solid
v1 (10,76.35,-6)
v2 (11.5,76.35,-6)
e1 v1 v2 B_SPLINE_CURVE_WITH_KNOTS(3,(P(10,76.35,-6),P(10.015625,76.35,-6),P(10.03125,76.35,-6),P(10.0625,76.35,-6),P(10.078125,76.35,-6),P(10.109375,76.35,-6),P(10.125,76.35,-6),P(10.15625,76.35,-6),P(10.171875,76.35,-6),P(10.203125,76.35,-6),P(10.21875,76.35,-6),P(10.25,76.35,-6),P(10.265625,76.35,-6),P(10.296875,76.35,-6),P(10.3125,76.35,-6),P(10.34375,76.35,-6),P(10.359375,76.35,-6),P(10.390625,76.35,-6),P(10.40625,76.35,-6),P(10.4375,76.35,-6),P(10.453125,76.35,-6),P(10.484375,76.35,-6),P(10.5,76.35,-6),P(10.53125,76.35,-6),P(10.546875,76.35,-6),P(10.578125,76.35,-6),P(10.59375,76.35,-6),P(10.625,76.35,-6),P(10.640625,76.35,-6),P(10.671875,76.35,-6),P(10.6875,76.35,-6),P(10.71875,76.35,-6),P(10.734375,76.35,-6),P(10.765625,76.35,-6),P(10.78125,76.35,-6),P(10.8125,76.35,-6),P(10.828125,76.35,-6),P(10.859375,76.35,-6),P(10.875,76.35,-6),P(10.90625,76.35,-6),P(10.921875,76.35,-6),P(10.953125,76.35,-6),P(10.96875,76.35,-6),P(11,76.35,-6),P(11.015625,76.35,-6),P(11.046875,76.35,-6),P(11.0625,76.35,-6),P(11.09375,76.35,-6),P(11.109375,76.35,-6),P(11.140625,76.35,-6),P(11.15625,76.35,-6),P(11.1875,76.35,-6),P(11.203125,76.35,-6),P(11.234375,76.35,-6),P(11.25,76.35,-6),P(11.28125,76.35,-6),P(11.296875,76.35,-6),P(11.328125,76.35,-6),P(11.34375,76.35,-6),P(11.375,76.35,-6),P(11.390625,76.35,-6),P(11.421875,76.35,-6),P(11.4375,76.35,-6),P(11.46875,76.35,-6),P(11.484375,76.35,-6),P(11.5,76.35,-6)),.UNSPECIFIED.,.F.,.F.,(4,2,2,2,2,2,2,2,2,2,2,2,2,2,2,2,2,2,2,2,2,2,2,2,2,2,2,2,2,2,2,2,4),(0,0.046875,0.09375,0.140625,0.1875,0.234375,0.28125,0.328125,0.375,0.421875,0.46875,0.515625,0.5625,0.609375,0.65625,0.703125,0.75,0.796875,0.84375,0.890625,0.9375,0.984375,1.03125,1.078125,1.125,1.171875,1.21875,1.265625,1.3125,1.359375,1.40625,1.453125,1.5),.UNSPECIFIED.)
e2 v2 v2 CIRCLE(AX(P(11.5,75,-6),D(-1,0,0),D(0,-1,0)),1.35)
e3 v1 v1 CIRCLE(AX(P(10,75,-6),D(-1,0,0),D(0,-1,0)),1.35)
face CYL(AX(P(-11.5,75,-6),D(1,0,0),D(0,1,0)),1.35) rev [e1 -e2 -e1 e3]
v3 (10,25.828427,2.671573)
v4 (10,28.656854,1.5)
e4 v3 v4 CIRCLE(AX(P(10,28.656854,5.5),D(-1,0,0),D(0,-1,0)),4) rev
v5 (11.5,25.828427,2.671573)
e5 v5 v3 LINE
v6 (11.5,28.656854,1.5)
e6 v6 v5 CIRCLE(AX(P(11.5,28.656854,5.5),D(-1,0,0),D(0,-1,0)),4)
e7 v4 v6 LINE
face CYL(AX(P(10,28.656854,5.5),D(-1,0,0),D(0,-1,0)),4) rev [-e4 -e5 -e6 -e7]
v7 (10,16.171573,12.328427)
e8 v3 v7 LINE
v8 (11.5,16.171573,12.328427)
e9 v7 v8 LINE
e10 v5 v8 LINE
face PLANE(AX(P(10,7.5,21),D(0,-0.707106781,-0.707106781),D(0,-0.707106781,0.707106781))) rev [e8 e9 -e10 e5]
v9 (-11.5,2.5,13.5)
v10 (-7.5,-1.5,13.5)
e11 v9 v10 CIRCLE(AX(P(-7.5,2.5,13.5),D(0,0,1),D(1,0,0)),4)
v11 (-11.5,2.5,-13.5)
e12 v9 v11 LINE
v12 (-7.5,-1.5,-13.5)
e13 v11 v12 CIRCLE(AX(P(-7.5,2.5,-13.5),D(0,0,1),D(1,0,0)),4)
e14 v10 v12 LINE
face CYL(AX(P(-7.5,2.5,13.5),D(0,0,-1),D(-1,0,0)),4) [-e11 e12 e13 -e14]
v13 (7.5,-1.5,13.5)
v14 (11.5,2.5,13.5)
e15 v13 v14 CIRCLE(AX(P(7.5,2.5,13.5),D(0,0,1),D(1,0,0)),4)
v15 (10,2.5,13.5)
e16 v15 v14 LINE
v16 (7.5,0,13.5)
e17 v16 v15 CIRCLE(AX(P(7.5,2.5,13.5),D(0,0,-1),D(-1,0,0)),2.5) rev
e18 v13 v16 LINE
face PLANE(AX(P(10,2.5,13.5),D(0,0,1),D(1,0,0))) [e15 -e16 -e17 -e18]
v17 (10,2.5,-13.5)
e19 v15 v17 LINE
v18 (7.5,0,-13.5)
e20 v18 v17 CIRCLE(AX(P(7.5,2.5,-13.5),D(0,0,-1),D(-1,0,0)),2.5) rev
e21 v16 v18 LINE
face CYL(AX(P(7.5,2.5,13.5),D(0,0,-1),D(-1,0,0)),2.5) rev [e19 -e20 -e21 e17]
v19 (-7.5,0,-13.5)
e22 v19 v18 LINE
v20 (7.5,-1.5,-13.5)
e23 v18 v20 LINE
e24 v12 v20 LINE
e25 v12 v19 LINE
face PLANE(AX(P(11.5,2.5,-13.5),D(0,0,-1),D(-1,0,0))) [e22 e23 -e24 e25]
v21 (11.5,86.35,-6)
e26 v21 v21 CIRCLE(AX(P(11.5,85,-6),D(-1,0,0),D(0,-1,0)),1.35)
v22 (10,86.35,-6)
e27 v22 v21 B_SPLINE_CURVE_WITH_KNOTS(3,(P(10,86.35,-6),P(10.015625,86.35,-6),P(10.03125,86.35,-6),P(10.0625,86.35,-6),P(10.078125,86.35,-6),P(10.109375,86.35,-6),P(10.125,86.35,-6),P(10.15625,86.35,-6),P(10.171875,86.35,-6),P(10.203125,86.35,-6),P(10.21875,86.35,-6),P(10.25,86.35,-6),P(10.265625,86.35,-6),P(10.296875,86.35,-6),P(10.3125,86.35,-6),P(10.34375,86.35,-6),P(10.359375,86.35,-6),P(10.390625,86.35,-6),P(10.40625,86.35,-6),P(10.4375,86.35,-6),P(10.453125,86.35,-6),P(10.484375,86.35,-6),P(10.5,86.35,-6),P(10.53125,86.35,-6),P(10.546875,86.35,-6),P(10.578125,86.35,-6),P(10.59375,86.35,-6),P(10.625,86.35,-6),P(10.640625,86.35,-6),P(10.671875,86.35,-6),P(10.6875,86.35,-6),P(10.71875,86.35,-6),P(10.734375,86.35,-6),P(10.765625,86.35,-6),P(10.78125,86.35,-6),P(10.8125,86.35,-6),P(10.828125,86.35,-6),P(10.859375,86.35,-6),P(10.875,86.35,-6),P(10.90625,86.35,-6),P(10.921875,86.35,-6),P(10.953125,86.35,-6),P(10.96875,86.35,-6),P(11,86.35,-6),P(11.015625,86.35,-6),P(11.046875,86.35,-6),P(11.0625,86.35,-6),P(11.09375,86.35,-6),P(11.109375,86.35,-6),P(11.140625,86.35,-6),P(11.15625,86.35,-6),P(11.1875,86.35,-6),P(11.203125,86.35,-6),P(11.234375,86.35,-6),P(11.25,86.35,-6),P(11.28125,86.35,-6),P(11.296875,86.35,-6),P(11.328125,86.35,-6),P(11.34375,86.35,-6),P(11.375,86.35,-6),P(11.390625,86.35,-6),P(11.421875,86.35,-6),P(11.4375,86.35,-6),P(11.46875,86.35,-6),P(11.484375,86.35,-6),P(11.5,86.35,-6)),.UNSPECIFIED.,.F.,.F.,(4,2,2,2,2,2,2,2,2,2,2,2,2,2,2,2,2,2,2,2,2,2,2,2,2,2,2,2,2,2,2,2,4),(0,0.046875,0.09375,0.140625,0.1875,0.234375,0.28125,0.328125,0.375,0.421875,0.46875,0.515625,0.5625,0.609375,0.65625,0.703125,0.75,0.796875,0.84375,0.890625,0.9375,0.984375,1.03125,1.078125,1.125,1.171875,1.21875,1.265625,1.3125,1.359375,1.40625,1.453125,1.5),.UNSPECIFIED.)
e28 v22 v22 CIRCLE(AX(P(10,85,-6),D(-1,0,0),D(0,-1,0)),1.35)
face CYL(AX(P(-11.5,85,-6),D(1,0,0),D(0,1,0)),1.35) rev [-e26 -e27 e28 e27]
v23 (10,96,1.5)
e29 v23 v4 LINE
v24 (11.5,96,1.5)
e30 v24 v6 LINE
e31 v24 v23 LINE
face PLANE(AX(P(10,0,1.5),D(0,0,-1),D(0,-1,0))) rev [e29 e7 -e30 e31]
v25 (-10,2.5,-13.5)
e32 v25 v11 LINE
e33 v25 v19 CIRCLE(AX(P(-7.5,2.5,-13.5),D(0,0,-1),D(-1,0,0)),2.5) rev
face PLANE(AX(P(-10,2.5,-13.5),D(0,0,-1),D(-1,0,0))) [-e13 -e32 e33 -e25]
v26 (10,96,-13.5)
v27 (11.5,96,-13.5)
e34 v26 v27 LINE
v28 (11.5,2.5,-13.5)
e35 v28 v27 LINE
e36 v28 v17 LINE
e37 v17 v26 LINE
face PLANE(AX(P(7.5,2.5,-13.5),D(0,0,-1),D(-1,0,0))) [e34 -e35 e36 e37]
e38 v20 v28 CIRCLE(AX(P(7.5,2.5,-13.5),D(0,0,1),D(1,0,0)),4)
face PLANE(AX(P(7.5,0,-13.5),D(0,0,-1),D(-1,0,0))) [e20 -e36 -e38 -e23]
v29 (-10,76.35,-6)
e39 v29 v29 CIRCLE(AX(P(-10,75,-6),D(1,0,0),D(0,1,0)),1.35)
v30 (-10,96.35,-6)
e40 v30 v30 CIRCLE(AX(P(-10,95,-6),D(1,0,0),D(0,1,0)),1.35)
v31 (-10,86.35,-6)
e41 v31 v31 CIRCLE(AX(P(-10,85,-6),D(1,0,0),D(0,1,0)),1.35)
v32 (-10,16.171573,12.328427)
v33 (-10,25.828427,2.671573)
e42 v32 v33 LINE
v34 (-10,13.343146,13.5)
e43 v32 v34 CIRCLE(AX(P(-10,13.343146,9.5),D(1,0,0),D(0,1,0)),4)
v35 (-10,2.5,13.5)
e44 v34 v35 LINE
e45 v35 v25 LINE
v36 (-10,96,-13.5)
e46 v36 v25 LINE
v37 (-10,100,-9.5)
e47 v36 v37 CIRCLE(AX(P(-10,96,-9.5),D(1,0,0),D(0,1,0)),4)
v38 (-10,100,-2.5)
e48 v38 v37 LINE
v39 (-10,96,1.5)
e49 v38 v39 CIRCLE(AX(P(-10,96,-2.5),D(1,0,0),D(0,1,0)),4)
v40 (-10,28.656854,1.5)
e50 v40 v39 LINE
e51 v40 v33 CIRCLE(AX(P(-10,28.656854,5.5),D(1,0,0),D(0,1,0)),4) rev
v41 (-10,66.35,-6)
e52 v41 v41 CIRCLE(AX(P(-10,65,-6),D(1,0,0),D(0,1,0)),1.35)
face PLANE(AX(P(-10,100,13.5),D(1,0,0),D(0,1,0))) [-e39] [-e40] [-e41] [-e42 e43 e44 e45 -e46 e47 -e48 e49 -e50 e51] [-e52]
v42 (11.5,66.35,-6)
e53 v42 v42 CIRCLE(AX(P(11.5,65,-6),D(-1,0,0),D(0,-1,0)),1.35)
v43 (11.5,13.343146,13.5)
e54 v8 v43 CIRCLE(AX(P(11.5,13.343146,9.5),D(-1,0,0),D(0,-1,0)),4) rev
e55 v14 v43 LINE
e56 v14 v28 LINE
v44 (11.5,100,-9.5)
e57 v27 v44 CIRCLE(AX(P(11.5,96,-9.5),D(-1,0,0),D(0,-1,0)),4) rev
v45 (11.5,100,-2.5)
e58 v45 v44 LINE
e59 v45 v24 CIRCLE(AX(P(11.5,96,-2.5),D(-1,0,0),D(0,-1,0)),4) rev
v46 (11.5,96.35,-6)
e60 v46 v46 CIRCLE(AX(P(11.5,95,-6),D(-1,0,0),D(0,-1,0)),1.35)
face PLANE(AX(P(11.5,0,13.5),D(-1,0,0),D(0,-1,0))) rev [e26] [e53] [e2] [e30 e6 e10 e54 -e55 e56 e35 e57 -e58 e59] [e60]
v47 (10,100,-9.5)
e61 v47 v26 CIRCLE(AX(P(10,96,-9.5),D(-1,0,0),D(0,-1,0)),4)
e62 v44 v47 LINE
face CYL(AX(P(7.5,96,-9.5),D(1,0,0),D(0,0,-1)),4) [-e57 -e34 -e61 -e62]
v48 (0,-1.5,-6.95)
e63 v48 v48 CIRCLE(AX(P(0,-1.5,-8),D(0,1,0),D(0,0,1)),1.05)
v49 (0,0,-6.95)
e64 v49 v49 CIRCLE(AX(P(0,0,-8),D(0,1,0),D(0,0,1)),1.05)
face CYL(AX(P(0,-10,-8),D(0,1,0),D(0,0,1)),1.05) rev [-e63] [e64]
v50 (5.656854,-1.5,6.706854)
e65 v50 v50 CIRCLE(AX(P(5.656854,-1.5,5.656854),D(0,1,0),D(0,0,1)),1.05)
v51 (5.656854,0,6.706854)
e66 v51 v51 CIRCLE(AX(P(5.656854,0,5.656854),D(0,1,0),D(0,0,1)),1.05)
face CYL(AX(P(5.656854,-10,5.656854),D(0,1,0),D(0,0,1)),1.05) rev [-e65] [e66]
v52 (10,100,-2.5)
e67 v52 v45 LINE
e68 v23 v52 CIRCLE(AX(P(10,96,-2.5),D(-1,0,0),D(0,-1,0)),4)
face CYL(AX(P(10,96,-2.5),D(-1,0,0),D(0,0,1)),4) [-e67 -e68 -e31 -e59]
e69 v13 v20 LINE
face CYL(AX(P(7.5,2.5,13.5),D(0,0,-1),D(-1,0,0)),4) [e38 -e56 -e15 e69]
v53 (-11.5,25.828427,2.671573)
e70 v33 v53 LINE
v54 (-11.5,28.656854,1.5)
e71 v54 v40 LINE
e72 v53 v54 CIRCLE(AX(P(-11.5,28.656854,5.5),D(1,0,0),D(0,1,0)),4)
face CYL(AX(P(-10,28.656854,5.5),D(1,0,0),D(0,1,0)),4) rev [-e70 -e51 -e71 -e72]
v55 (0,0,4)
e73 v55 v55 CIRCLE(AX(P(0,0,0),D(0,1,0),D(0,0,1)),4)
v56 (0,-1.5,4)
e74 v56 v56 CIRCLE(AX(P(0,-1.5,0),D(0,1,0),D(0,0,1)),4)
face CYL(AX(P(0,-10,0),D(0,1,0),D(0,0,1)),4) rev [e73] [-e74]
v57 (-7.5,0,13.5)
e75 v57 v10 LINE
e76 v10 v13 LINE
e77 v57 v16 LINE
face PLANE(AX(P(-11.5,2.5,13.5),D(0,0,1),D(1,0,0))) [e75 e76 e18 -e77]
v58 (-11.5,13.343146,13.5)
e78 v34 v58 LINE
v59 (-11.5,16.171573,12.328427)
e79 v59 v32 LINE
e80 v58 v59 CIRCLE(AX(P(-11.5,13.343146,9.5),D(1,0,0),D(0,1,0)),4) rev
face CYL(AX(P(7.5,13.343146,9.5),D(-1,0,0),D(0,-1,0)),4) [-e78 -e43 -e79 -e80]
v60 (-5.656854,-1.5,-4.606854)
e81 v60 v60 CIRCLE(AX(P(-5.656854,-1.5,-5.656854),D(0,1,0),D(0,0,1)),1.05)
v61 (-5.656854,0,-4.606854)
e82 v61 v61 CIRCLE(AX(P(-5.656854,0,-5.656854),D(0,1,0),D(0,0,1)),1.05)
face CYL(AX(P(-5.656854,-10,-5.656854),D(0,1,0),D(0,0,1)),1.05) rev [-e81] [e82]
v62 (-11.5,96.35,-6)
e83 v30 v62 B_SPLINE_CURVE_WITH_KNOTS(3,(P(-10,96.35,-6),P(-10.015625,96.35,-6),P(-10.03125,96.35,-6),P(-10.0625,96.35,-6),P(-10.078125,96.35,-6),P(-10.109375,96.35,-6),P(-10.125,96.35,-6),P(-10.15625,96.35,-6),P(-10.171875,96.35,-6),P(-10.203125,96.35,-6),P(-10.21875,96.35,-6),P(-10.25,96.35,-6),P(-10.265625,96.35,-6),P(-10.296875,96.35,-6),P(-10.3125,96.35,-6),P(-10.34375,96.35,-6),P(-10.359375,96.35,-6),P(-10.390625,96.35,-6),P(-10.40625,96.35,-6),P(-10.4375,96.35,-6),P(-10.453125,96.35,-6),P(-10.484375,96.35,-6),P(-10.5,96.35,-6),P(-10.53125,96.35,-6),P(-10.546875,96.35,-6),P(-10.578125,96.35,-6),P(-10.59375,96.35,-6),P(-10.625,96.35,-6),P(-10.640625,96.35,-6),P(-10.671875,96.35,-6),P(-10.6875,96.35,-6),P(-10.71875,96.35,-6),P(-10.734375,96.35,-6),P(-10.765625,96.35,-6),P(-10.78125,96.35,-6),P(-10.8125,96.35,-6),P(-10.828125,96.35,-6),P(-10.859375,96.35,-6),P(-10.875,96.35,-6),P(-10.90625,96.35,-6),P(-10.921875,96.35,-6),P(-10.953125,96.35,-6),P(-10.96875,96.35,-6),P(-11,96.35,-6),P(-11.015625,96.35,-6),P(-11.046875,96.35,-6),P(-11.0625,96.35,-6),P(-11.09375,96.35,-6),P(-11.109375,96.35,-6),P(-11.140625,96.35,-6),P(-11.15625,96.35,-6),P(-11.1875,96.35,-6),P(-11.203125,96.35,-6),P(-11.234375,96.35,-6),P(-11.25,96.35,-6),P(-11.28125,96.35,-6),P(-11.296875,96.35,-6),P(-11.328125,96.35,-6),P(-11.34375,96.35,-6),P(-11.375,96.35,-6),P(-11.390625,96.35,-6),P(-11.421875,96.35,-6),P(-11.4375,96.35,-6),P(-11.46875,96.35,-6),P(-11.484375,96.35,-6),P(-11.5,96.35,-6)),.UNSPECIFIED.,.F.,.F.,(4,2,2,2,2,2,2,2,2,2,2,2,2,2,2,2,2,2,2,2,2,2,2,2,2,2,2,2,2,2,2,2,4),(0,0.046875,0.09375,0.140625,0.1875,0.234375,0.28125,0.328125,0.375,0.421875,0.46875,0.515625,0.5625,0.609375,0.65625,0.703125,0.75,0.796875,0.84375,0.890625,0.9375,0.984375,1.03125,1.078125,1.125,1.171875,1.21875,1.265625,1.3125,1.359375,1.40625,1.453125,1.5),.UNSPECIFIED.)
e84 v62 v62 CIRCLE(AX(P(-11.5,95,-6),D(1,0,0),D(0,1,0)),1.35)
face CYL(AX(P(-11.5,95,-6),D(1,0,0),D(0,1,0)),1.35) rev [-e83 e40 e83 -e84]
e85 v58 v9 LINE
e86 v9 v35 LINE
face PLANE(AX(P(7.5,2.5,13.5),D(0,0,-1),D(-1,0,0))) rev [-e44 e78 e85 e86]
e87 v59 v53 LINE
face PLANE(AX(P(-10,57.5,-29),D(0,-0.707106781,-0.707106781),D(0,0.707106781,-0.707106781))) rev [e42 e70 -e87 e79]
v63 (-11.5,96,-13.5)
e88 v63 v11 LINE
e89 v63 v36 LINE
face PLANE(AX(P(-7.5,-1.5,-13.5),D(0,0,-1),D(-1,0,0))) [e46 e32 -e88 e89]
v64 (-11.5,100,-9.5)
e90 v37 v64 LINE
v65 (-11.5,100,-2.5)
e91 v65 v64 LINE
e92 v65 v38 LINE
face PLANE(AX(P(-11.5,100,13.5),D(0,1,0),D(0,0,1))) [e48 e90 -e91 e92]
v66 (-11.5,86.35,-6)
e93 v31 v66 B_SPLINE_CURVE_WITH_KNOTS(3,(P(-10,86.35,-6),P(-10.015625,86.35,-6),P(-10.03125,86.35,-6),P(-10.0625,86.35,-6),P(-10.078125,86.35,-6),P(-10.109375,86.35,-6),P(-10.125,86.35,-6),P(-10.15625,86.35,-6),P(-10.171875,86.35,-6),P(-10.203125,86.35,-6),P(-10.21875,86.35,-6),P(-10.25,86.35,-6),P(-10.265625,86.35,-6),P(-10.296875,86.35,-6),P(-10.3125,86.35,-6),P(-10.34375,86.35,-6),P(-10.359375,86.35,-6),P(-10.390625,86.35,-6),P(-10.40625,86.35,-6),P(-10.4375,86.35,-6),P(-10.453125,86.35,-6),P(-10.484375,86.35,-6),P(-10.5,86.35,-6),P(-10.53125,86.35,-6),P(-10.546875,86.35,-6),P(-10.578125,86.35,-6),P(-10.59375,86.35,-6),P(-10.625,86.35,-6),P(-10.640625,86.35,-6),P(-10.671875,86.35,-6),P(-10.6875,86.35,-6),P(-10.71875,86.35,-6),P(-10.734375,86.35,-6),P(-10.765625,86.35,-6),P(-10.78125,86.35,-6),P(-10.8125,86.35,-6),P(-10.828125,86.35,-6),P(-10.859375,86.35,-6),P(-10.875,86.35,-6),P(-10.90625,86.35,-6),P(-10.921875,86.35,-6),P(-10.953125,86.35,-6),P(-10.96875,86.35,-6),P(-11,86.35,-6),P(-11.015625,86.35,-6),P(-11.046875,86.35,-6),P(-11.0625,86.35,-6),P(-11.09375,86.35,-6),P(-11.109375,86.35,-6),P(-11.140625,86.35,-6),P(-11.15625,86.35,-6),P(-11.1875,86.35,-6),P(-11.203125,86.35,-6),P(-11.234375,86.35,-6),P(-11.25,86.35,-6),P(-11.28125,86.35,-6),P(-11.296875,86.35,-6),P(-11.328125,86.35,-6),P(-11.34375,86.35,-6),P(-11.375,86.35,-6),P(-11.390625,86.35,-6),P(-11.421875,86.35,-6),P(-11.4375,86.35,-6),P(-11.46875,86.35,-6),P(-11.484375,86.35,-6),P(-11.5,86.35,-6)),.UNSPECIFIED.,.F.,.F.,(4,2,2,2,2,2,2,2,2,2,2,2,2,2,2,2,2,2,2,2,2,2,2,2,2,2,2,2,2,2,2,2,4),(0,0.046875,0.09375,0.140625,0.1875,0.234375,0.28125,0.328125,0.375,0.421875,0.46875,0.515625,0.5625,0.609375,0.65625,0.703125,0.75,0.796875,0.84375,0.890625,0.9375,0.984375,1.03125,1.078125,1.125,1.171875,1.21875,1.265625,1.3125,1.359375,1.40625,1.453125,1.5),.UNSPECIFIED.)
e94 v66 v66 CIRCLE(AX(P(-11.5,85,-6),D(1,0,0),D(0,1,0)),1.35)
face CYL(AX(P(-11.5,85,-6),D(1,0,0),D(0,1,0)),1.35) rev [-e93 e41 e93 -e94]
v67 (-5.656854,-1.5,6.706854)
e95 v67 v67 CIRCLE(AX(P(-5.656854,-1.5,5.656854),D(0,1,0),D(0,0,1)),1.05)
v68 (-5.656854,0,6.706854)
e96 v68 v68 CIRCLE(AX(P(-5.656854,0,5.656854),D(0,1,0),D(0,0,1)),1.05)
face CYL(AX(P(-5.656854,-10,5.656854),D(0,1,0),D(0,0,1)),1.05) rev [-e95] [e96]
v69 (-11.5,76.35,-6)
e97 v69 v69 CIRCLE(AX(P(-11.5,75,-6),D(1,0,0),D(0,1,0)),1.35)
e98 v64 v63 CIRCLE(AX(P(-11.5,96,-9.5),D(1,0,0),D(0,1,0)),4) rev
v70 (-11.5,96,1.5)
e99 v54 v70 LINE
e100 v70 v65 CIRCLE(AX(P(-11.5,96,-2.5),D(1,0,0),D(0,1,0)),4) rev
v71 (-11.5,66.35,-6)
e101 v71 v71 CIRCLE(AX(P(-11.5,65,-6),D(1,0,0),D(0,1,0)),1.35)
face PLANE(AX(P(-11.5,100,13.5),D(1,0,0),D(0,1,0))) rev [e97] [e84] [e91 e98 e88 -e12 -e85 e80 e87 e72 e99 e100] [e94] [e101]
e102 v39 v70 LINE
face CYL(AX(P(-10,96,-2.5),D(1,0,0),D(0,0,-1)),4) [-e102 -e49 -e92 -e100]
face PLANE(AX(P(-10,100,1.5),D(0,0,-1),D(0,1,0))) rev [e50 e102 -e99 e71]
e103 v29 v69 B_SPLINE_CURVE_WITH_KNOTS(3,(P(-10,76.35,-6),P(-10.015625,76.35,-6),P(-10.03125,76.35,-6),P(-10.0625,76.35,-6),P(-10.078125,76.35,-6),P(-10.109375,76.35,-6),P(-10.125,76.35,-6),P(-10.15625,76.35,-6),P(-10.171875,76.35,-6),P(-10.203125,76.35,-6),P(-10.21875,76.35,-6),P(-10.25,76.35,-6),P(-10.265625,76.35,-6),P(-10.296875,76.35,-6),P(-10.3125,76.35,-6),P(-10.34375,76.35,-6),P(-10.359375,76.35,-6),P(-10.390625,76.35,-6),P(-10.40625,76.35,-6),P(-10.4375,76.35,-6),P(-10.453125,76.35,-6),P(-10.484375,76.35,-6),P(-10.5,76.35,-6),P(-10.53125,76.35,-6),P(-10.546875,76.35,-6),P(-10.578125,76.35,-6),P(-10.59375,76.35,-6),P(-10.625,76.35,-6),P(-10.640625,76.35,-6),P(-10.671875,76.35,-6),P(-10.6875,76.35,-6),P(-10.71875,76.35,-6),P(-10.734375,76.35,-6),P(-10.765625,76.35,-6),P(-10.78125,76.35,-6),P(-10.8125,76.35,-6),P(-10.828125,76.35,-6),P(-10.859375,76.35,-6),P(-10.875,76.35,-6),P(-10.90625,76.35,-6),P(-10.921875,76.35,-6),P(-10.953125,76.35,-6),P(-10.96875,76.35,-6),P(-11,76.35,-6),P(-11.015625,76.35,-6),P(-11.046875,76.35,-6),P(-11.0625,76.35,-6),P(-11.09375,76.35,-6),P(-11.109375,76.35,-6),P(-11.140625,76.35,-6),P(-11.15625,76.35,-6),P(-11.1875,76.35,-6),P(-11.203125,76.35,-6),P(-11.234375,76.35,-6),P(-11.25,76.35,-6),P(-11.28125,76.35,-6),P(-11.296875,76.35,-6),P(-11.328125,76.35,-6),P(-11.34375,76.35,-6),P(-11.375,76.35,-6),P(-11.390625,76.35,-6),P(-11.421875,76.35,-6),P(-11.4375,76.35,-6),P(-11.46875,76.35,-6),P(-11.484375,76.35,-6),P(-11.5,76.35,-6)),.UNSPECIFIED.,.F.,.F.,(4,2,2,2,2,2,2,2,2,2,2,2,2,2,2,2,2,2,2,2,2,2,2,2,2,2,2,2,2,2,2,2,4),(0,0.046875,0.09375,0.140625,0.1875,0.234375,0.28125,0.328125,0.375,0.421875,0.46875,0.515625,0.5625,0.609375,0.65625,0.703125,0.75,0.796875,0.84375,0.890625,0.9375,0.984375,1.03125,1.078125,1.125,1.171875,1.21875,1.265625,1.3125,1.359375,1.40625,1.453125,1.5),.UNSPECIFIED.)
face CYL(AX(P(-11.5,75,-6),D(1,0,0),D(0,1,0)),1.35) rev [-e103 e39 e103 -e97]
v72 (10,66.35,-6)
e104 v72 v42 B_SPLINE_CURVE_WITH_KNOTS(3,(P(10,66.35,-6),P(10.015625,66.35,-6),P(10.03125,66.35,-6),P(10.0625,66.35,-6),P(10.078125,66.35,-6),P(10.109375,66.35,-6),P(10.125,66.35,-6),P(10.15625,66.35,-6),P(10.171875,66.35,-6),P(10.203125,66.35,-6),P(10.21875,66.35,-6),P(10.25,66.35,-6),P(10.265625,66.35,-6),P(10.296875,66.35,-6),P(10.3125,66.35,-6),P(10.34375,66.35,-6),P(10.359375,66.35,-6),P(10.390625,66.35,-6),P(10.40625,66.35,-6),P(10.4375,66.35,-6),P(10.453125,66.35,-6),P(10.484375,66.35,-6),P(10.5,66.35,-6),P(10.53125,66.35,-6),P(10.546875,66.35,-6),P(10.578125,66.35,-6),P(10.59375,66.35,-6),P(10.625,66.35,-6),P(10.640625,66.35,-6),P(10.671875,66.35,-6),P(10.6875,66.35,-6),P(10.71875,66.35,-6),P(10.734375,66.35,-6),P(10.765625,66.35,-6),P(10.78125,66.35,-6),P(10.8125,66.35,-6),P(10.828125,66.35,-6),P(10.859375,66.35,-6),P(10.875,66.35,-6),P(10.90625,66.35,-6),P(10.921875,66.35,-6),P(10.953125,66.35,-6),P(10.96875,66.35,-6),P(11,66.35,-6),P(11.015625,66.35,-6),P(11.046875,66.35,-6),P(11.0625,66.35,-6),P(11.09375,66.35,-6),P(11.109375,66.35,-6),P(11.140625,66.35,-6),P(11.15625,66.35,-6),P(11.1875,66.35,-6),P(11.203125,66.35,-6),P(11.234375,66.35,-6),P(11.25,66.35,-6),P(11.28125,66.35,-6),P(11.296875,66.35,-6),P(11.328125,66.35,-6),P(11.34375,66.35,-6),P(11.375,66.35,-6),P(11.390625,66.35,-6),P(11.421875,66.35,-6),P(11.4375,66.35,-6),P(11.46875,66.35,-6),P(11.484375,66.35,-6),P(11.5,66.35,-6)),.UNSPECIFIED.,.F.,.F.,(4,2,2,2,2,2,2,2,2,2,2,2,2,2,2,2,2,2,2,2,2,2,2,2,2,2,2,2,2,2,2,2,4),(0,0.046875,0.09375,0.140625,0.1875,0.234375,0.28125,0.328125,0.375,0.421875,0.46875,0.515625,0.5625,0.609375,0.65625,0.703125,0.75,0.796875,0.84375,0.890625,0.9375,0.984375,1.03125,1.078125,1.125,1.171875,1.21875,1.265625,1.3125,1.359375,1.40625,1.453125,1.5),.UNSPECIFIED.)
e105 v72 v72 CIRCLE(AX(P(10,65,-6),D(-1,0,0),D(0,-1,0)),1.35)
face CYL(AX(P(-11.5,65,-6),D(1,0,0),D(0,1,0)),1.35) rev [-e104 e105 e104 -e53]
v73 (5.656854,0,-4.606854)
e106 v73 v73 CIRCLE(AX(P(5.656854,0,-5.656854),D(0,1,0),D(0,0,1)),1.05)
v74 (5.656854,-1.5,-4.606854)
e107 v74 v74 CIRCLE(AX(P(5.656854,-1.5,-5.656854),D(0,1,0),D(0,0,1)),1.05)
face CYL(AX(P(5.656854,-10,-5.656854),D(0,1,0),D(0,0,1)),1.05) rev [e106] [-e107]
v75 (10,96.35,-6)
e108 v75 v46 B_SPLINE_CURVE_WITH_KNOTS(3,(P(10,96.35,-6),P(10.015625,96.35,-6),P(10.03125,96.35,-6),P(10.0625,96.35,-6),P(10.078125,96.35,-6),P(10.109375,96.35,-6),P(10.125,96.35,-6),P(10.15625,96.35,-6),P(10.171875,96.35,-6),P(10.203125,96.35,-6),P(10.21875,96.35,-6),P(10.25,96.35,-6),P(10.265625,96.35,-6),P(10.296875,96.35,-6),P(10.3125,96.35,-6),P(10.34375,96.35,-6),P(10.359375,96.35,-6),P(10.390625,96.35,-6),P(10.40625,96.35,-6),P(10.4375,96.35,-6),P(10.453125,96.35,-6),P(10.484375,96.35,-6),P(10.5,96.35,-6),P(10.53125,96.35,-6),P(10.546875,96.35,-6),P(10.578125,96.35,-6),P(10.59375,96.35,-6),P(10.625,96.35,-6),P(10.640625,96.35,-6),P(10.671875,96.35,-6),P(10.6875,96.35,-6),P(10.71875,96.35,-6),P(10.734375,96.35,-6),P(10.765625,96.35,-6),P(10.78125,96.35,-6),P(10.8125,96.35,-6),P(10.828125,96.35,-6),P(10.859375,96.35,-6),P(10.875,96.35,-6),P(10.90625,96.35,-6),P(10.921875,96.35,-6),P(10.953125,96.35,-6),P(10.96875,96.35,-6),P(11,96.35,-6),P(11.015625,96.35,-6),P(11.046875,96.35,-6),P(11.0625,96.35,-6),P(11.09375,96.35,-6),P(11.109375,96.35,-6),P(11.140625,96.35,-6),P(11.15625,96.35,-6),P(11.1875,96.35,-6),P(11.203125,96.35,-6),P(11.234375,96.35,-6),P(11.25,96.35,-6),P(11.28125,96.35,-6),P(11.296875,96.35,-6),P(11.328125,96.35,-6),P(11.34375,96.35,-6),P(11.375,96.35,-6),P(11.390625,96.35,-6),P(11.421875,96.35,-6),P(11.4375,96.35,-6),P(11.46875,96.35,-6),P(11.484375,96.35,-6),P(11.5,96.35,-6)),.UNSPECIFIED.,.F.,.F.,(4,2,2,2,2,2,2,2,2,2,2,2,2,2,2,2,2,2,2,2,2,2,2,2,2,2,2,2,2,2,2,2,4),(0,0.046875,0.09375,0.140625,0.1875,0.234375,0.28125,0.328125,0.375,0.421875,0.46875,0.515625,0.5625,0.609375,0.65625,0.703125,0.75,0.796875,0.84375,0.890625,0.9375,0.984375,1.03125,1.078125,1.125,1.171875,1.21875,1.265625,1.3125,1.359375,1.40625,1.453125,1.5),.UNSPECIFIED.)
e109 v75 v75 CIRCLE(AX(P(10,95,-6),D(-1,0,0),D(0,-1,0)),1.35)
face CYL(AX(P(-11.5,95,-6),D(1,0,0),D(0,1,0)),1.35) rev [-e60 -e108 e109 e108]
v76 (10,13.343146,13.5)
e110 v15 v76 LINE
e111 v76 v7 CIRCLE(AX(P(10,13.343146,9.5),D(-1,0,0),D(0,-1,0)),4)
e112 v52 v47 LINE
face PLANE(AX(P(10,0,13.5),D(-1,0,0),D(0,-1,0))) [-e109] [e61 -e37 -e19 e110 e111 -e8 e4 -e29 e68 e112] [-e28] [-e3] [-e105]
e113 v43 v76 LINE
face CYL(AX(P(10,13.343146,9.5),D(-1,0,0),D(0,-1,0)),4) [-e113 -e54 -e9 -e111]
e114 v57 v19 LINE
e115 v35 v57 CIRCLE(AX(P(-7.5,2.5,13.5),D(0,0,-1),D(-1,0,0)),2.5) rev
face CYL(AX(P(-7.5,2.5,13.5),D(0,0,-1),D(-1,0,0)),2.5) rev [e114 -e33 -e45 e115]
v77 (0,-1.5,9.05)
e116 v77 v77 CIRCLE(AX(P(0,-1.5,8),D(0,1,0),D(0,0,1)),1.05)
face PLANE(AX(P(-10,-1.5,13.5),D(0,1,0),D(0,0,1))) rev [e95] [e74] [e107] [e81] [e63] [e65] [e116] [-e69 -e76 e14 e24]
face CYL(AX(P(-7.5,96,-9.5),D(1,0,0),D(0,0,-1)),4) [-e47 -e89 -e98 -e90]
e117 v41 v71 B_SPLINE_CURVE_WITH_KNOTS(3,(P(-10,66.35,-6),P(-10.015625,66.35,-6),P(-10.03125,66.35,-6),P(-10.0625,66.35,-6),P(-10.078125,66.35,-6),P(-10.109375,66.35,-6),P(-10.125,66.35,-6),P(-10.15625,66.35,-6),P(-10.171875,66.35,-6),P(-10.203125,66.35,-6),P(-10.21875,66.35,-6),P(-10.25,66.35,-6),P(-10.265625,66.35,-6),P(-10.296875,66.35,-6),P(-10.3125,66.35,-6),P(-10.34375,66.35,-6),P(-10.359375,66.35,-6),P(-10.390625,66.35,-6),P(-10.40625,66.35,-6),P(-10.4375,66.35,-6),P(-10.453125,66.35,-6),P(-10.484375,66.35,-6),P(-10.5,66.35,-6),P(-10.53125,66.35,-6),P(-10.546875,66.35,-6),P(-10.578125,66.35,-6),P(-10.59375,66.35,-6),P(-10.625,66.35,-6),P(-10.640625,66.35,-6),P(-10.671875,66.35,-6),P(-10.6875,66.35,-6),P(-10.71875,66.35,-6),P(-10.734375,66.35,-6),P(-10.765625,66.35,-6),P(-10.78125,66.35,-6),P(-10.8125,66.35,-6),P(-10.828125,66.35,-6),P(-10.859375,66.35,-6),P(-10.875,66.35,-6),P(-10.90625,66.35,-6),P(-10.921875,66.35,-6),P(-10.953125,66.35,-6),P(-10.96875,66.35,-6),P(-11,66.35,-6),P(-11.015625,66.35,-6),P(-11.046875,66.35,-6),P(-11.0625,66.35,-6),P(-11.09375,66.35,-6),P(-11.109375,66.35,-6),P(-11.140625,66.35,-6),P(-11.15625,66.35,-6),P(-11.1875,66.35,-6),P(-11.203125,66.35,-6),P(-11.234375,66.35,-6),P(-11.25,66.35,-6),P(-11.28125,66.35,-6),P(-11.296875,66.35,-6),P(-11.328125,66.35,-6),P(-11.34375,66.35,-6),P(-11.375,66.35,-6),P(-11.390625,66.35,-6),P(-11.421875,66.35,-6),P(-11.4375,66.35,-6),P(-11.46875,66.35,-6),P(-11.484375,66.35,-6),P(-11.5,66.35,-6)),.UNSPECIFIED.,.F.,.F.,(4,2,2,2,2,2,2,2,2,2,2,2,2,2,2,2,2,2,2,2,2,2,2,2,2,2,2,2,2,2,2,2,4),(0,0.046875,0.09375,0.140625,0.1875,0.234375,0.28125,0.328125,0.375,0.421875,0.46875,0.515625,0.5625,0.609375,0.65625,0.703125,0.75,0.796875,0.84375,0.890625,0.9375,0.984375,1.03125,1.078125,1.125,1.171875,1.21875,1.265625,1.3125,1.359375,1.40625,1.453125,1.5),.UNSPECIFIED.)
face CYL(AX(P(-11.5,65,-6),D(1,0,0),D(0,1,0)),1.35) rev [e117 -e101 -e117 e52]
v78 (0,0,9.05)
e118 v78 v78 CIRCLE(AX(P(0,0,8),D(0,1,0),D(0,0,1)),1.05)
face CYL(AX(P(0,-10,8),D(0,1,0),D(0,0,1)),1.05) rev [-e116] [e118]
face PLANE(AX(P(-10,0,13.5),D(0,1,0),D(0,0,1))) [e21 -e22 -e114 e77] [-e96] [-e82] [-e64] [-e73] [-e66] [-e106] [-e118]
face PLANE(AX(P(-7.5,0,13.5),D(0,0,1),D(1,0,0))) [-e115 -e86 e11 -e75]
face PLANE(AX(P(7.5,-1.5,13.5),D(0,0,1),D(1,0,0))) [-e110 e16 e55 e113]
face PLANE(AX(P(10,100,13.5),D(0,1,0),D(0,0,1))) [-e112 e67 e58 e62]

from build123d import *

# Parameters (mm, degrees)
BASE_FLANGE1_DEPTH      = 13.5
SKETCH5_R               = 4
SKETCH5_R_2             = 1.05
CUT_EXTRUDE1_DEPTH      = 10
CUT_EXTRUDE2_DEPTH      = 102.5603269
CUT_EXTRUDE2_DEPTH_BACK = 102.5603269
CUT_EXTRUDE3_DEPTH      = 104.495168969
CUT_EXTRUDE3_DEPTH_BACK = 104.495168969
SKETCH7_R               = 1.35
FILLET1_R               = 4


# Sheet-metal steps are written as plain solids
with BuildPart() as part:
    # Sketch1 → Base-Flange1 (new, symmetric)
    with BuildSketch(Plane.XY):
        with BuildLine():
            Line((-10, 100), (-10, 2.5))
            ThreePointArc((-10, 2.5), (-9.267766953, 0.732233047), (-7.5, 0))
            Line((-7.5, 0), (7.5, 0))
            ThreePointArc((7.5, 0), (9.267766953, 0.732233047), (10, 2.5))
            Line((10, 2.5), (10, 100))
            Line((10, 100), (11.5, 100))
            Line((11.5, 100), (11.5, 2.5))
            ThreePointArc((11.5, 2.5), (10.328427125, -0.328427125), (7.5, -1.5))
            Line((7.5, -1.5), (-7.5, -1.5))
            ThreePointArc((-7.5, -1.5), (-10.328427125, -0.328427125), (-11.5, 2.5))
            Line((-11.5, 2.5), (-11.5, 100))
            Line((-11.5, 100), (-10, 100))
        make_face()
    extrude(amount=BASE_FLANGE1_DEPTH, both=True)

    # Sketch5 → Cut-Extrude1 (cut)
    with BuildSketch(Plane(origin=(0, 0, 0), x_dir=(1, 0, 0), z_dir=(0, 1, 0))):
        with Locations(Location((0, 0, 0), (0, 0, 270))):
            Circle(SKETCH5_R)
        with Locations(Location((-5.656854249, 5.656854249, 0), (0, 0, 270))):
            Circle(SKETCH5_R_2)
        with Locations(Location((0, 8, 0), (0, 0, 270))):
            Circle(SKETCH5_R_2)
        with Locations(Location((5.656854249, 5.656854249, 0), (0, 0, 270))):
            Circle(SKETCH5_R_2)
        with Locations(Location((5.656854249, -5.656854249, 0), (0, 0, 270))):
            Circle(SKETCH5_R_2)
        with Locations(Location((0, -8, 0), (0, 0, 270))):
            Circle(SKETCH5_R_2)
        with Locations(Location((-5.656854249, -5.656854249, 0), (0, 0, 270))):
            Circle(SKETCH5_R_2)
    extrude(amount=-CUT_EXTRUDE1_DEPTH, mode=Mode.SUBTRACT)

    # Sketch6 → Cut-Extrude2 (cut, two sides: drawn at the far end of the back side and taken through both)
    with BuildSketch(Plane(origin=(0, 0, 0), x_dir=(0, 0, -1), z_dir=(1, 0, 0)).offset(-CUT_EXTRUDE2_DEPTH_BACK)):
        Polygon((-1.5, 100), (-1.5, 27), (-13.5, 15), (-13.5, 100), align=None)
    extrude(amount=CUT_EXTRUDE2_DEPTH + CUT_EXTRUDE2_DEPTH_BACK, mode=Mode.SUBTRACT)

    # Sketch7 → Cut-Extrude3 (cut, two sides: drawn at the far end of the back side and taken through both)
    with BuildSketch(Plane(origin=(11.5, 0, 0), x_dir=(0, 0, -1), z_dir=(1, 0, 0)).offset(-CUT_EXTRUDE3_DEPTH_BACK)):
        with Locations(Location((6, 95, 0), (0, 0, 90))):
            Circle(SKETCH7_R)
        with Locations(Location((6, 85, 0), (0, 0, 90))):
            Circle(SKETCH7_R)
        with Locations(Location((6, 75, 0), (0, 0, 90))):
            Circle(SKETCH7_R)
        with Locations(Location((6, 65, 0), (0, 0, 90))):
            Circle(SKETCH7_R)
    extrude(amount=CUT_EXTRUDE3_DEPTH + CUT_EXTRUDE3_DEPTH_BACK, mode=Mode.SUBTRACT)

    # Fillet1
    fillet1_edges = [part.edges().sort_by_distance(p)[0] for p in [
        (-10.75, 27, 1.5),
        (-10.75, 100, 1.5),
        (-10.75, 15, 13.5),
        (-10.75, 100, -13.5),
        (10.75, 27, 1.5),
        (10.75, 15, 13.5),
        (10.75, 100, 1.5),
        (10.75, 100, -13.5),
    ]]
    fillet(fillet1_edges, radius=FILLET1_R)


solid = part.part
